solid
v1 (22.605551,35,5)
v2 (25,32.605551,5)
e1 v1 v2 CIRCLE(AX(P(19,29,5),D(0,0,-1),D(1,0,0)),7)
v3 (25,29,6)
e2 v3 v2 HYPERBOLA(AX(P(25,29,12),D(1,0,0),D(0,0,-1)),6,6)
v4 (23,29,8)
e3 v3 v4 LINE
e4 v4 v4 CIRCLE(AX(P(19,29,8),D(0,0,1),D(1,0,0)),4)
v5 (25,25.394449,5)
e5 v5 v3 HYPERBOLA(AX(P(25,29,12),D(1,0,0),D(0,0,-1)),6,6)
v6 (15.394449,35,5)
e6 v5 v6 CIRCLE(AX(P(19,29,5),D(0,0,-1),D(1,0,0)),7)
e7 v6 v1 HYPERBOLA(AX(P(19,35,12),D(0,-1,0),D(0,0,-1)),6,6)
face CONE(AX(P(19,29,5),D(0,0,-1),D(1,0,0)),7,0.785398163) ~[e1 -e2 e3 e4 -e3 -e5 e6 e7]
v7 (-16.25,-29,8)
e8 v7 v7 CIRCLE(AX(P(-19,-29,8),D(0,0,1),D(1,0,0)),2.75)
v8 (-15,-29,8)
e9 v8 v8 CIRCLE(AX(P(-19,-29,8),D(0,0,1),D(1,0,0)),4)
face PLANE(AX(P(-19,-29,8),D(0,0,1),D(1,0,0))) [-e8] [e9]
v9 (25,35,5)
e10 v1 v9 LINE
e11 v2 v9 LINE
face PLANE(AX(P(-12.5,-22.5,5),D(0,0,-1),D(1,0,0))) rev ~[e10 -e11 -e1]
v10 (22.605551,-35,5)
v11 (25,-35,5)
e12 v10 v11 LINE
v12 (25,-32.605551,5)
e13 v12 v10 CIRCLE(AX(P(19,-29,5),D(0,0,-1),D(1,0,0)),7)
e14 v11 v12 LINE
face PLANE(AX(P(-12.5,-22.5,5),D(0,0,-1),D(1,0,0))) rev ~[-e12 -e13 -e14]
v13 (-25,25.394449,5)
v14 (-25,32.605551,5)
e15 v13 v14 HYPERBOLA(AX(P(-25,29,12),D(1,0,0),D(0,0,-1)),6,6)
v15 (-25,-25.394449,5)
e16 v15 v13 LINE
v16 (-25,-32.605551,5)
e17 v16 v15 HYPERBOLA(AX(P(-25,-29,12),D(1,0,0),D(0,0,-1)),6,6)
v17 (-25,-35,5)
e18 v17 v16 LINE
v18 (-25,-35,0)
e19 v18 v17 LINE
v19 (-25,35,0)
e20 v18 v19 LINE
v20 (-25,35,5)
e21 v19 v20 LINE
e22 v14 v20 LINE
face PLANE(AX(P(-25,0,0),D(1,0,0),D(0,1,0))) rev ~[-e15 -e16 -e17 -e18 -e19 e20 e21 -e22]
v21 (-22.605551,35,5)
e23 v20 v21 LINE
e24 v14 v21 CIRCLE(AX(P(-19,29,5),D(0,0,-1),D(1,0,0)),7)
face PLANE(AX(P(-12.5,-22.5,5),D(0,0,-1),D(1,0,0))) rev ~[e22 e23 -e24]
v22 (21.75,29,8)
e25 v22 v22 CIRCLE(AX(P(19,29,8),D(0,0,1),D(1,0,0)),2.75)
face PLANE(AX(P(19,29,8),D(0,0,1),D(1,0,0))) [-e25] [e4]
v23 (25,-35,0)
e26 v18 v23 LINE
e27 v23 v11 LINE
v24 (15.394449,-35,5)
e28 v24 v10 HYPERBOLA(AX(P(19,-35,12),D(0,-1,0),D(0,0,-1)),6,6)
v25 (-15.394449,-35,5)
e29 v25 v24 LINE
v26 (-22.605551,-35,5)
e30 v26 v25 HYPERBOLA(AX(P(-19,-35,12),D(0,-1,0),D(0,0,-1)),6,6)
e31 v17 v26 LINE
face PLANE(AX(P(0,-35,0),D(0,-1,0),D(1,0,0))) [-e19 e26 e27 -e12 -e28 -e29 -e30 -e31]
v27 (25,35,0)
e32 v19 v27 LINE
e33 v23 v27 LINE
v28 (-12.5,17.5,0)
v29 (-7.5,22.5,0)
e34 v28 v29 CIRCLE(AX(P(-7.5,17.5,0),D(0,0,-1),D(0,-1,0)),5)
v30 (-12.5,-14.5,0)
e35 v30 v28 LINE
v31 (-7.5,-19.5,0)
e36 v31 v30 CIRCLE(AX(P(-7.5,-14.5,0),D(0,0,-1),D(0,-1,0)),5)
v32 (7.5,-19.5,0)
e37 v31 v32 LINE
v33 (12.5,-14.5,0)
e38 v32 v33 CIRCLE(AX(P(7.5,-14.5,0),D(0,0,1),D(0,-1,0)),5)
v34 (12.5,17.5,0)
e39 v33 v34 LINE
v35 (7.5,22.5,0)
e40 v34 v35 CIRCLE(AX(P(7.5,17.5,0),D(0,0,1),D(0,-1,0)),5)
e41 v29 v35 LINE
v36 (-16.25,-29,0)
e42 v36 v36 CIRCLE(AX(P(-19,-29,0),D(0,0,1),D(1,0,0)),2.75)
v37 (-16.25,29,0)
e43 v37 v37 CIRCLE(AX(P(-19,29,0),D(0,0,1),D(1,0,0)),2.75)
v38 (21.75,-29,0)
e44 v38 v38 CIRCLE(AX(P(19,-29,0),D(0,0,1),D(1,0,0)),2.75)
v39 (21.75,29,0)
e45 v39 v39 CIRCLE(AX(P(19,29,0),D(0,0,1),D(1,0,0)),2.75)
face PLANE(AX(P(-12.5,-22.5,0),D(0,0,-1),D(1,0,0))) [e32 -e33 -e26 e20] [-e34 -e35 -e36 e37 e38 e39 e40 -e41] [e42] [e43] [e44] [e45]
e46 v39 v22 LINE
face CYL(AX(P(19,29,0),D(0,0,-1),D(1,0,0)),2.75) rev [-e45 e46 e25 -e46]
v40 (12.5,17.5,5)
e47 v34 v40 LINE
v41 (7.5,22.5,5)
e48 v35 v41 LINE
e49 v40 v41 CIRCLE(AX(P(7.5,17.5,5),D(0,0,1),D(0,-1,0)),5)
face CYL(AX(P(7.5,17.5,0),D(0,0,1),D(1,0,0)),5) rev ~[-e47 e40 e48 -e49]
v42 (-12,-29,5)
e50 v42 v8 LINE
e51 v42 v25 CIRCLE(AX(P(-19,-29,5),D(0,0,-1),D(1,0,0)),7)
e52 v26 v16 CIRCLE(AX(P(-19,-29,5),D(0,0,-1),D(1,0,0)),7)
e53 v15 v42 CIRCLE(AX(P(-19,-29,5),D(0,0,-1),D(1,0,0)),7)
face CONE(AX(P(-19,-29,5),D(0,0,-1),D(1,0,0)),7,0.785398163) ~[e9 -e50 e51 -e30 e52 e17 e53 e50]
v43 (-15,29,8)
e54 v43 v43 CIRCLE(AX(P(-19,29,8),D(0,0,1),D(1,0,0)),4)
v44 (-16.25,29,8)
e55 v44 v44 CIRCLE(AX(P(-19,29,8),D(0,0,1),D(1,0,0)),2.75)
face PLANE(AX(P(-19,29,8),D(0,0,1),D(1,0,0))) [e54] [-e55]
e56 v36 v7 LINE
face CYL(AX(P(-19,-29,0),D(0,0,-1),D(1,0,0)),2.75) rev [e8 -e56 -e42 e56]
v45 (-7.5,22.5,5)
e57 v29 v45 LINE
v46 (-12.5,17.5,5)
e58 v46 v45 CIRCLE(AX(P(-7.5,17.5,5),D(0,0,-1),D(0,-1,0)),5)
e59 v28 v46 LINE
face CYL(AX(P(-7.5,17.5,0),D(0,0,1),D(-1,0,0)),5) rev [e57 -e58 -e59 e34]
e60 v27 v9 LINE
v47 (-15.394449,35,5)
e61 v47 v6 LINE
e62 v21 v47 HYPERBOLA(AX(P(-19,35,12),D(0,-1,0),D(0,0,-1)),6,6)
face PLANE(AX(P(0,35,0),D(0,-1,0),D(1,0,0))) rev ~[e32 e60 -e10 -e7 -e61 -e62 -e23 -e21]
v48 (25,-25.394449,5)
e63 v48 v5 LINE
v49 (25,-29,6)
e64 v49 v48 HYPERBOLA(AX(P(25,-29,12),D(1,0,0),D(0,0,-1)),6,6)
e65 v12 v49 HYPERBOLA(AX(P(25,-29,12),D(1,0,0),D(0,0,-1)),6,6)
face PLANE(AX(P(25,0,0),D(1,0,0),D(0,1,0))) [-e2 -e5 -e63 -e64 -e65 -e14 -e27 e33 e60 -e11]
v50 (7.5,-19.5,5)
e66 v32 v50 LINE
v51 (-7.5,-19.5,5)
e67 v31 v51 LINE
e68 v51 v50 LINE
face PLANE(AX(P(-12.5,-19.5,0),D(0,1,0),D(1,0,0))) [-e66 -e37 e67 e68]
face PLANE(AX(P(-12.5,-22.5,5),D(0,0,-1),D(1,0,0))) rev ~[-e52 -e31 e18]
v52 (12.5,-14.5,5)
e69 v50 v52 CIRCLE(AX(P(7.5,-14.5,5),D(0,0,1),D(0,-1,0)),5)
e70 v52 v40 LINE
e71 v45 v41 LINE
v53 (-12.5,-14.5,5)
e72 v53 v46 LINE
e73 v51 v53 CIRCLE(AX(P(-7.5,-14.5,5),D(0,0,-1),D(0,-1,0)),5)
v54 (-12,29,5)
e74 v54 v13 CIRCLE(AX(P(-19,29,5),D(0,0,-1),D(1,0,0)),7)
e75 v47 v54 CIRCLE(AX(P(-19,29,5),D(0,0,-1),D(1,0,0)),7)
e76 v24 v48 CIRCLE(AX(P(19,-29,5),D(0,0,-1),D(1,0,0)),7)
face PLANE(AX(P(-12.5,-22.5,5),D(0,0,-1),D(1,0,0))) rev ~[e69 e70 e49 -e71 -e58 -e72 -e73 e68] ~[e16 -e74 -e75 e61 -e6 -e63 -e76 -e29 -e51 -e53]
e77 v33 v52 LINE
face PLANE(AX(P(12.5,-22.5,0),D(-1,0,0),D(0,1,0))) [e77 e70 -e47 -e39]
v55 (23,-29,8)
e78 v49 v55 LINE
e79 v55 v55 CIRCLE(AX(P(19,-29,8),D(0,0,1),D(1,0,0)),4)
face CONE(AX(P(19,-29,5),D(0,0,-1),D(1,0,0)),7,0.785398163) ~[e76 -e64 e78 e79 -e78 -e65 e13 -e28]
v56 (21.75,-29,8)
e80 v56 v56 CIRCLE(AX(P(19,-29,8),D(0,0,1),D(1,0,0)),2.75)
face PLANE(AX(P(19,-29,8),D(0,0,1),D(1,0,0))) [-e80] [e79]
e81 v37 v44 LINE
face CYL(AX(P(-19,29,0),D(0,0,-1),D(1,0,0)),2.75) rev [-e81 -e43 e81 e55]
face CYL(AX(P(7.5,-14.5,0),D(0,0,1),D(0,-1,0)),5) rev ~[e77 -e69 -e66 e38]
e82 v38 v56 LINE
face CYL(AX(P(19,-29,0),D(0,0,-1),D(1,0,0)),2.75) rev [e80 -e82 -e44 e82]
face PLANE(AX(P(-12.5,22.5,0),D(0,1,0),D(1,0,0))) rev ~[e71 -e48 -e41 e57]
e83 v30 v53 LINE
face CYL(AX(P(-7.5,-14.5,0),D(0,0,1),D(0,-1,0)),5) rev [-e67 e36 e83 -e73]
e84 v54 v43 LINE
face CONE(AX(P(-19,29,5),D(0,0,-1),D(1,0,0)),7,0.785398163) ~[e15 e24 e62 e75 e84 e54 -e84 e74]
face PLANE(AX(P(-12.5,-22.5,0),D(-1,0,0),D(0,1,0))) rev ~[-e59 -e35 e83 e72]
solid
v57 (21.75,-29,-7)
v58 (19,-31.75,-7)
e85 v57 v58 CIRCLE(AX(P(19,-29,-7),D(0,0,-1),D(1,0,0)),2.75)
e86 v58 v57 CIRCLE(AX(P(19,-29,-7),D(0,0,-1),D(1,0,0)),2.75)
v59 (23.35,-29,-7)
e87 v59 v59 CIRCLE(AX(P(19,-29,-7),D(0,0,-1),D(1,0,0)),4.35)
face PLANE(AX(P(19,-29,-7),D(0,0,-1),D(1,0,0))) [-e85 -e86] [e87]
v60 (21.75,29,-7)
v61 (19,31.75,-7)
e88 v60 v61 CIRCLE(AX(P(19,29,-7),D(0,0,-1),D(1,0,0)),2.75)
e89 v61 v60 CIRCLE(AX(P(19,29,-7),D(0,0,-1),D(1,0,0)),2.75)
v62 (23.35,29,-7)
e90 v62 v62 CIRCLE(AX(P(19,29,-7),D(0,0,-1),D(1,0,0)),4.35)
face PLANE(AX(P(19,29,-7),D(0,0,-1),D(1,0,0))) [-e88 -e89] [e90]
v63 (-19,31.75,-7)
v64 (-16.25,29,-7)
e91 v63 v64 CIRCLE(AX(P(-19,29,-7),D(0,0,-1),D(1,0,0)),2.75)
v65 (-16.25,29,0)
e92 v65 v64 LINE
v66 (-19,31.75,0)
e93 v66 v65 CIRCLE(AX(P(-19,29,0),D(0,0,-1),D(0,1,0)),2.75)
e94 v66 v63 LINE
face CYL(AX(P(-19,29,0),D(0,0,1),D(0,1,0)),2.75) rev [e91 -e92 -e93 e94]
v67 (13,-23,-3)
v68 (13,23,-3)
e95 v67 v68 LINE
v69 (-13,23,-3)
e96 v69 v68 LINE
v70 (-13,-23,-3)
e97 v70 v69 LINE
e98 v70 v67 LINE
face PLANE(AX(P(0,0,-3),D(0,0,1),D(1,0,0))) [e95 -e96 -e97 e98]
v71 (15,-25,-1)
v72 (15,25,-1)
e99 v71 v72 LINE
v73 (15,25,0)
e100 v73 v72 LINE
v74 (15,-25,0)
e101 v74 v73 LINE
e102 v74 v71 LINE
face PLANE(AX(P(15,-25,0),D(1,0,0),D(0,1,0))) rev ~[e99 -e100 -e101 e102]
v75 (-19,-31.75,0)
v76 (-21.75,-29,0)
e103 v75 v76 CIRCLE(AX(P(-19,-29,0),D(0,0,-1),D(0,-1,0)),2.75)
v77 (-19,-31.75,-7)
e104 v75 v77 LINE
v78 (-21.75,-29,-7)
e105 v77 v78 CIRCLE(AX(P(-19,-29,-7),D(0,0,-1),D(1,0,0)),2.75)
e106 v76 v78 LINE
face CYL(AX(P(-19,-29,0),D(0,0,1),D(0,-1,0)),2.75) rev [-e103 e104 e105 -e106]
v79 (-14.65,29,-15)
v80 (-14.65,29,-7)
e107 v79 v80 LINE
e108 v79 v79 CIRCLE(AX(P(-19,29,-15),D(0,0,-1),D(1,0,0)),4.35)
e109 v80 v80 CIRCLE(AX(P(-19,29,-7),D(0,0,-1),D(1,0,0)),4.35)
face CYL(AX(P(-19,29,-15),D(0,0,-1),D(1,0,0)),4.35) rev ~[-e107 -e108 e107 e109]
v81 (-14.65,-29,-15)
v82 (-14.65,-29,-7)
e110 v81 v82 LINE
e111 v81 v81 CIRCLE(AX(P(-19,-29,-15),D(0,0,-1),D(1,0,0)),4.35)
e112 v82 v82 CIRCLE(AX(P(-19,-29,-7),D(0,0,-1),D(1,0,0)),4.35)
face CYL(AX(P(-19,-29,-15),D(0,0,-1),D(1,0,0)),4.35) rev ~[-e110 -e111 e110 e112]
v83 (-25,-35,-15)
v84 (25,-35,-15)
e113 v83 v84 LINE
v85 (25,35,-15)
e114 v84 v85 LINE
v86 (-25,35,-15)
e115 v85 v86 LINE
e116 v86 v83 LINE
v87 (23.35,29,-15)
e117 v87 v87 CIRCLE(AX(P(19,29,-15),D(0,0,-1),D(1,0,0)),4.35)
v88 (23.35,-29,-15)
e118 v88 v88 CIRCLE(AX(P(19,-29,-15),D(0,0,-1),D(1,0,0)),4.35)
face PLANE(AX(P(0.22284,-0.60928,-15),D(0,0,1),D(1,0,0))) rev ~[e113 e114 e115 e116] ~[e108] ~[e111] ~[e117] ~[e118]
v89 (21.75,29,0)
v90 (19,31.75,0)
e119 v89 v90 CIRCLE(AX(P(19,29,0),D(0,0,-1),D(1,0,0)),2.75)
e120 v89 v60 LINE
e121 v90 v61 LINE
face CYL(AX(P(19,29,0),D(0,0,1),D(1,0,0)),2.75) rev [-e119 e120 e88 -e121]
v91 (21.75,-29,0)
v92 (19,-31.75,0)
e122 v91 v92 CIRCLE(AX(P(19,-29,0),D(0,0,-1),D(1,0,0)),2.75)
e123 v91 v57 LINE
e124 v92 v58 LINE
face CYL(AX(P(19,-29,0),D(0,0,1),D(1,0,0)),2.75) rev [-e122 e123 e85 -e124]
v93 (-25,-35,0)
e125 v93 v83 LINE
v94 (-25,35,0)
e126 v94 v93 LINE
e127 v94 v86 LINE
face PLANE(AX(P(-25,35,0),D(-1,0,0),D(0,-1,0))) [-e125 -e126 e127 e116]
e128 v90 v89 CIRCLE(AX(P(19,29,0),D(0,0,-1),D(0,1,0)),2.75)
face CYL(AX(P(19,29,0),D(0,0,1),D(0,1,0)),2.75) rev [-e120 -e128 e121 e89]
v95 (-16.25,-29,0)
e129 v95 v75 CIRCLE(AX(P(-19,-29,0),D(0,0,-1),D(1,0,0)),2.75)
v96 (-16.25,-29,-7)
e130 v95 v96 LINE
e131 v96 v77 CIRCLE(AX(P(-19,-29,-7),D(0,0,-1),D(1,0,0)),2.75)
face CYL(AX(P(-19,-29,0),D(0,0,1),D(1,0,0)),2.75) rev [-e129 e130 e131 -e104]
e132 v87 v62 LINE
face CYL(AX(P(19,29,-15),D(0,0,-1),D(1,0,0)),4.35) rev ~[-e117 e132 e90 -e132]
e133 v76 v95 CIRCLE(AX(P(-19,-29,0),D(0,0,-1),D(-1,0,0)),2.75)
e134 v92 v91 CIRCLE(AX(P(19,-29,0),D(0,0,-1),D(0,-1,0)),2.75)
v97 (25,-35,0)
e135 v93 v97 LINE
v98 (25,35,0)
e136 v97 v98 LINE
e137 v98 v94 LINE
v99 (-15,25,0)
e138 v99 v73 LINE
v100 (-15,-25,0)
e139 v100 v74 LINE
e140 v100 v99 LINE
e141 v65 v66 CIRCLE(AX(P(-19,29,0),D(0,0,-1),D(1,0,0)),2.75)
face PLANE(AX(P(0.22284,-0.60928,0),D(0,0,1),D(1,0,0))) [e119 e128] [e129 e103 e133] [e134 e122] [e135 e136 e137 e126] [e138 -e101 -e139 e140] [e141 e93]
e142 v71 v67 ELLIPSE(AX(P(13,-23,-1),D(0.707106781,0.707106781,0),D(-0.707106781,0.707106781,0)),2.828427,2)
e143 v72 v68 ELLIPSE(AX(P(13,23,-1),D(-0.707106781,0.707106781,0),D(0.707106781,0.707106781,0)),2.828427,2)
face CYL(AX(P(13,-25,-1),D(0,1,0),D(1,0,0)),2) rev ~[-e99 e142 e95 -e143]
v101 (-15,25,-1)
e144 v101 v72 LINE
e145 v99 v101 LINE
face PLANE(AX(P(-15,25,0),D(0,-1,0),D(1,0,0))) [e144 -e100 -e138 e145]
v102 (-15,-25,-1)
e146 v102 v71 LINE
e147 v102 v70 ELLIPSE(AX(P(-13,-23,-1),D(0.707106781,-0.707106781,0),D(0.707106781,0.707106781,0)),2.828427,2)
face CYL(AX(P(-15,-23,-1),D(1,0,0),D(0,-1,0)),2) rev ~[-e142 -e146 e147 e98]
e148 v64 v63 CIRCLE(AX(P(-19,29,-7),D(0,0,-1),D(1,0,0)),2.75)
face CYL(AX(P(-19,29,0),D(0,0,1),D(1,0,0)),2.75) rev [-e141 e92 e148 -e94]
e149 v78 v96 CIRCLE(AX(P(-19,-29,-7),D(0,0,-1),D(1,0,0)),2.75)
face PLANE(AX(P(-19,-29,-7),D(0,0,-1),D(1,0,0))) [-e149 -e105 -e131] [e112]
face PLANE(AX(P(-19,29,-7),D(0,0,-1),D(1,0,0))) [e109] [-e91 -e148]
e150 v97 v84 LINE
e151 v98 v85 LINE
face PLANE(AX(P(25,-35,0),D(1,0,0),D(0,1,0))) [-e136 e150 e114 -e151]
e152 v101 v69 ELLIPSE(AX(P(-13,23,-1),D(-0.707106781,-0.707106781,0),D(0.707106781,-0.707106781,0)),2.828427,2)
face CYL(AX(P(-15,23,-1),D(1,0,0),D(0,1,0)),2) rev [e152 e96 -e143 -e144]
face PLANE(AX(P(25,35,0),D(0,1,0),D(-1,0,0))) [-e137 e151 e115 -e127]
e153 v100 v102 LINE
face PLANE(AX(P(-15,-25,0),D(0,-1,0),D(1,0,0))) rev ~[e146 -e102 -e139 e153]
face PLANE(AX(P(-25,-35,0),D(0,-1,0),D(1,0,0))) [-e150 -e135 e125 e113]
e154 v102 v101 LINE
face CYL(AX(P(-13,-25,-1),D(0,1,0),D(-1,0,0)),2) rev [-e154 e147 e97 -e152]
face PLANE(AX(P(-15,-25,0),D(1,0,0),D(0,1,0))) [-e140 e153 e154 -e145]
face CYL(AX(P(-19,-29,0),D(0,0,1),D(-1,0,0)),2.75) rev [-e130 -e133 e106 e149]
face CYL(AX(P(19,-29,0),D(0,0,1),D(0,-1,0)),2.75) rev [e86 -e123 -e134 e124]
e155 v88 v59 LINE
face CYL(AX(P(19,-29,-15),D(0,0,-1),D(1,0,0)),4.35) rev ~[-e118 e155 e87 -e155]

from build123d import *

# Parameters (mm, degrees)
F0_W     = 30
F0_H     = 50
F1_DEPTH = 15
F2_R     = 4.35
F2_R_2   = 2.75
F3_DEPTH = 8
F4_DEPTH = 3
F5_R     = 2
F6_W     = 50
F6_H     = 70
F6_R     = 4
F6_W_2   = 30
F6_H_2   = 50
F6_W_3   = 25
F6_H_3   = 45
F6_R_2   = 2.75
F7_DEPTH = 5
F8_DEPTH = 8
F9_DEPTH = 3
F11_R    = 5


# Not quite as in the source:
# - a fillet or chamfer that OpenCascade refuses, or shapes differently, is made with other operations: its cross-section is extruded or revolved along the edge and cut away or added


with BuildPart() as f1:
    # F0 (on Top) → F1 (new body)
    with BuildSketch(Plane.XY):
        with BuildLine():
            Line((19, 31.75), (19, 35))
            Line((19, 35), (-19, 35))
            Line((-19, 35), (-25, 35))
            Line((-25, 35), (-25, -29))
            Line((-25, -29), (-21.75, -29))
            ThreePointArc((-21.75, -29), (-19, -26.25), (-16.25, -29))
            ThreePointArc((-16.25, -29), (-17.0554563517, -30.9445436483), (-19, -31.75))
            Line((-19, -31.75), (-19, -35))
            Line((-19, -35), (19, -35))
            Line((19, -35), (19, -31.75))
            ThreePointArc((19, -31.75), (17.0554563517, -27.0554563517), (21.75, -29))
            Line((21.75, -29), (25, -29))
            Line((25, -29), (25, 29))
            Line((25, 29), (21.75, 29))
            ThreePointArc((21.75, 29), (17.0554563517, 27.0554563517), (19, 31.75))
        make_face()
        with BuildLine():
            ThreePointArc((-16.25, 29), (-20.9445436483, 27.0554563517), (-19, 31.75))
            ThreePointArc((-19, 31.75), (-17.0554563517, 30.9445436483), (-16.25, 29))
        make_face(mode=Mode.SUBTRACT)
        Rectangle(F0_W, F0_H, mode=Mode.SUBTRACT)
        with BuildLine():
            Line((25, 29), (25, 35))
            Line((25, 35), (19, 35))
            Line((19, 35), (19, 31.75))
            ThreePointArc((19, 31.75), (20.9445436483, 30.9445436483), (21.75, 29))
            Line((21.75, 29), (25, 29))
        make_face()
        with BuildLine():
            Line((25, -35), (25, -29))
            Line((25, -29), (21.75, -29))
            ThreePointArc((21.75, -29), (20.9445436483, -30.9445436483), (19, -31.75))
            Line((19, -31.75), (19, -35))
            Line((19, -35), (25, -35))
        make_face()
        with BuildLine():
            Line((-21.75, -29), (-25, -29))
            Line((-25, -29), (-25, -35))
            Line((-25, -35), (-19, -35))
            Line((-19, -35), (-19, -31.75))
            ThreePointArc((-19, -31.75), (-20.9445436483, -30.9445436483), (-21.75, -29))
        make_face()
        Rectangle(F0_W, F0_H)
    extrude(amount=-F1_DEPTH)

    # F2 (on face) → F3 (cut)
    with BuildSketch(Plane(origin=(0, 0, -15), x_dir=(1, 0, 0), z_dir=(0, 0, -1))):
        with Locations((-19, 29)):
            Circle(F2_R)
        with Locations((-19, 29)):
            Circle(F2_R_2, mode=Mode.SUBTRACT)
        with Locations((19, 29)):
            Circle(F2_R)
        with Locations((19, 29)):
            Circle(F2_R_2, mode=Mode.SUBTRACT)
        with Locations((19, -29)):
            Circle(F2_R)
        with Locations((19, -29)):
            Circle(F2_R_2, mode=Mode.SUBTRACT)
        with Locations((-19, -29)):
            Circle(F2_R)
        with Locations((-19, -29)):
            Circle(F2_R_2, mode=Mode.SUBTRACT)
    extrude(amount=-F3_DEPTH, mode=Mode.SUBTRACT)

    # F0 (on Top) → F4 (cut)
    with BuildSketch(Plane.XY):
        Rectangle(F0_W, F0_H)
    extrude(amount=-F4_DEPTH, mode=Mode.SUBTRACT)

    # F5
    f5_edges = [f1.edges().sort_by_distance(p)[0] for p in [
        (0, 25, -3),
        (15, 0, -3),
        (-15, 0, -3),
        (0, -25, -3),
    ]]
    fillet(f5_edges, radius=F5_R)


with BuildPart() as f7:
    # F6 (on face) → F7 (new body)
    with BuildSketch(Plane.XY):
        Rectangle(F6_W, F6_H)
        with Locations((-19, -29)):
            Circle(F6_R, mode=Mode.SUBTRACT)
        with Locations((19, -29)):
            Circle(F6_R, mode=Mode.SUBTRACT)
        with Locations((-19, 29)):
            Circle(F6_R, mode=Mode.SUBTRACT)
        Rectangle(F6_W_2, F6_H_2, mode=Mode.SUBTRACT)
        with Locations((19, 29)):
            Circle(F6_R, mode=Mode.SUBTRACT)
        Rectangle(F6_W_2, F6_H_2)
        Rectangle(F6_W_3, F6_H_3, mode=Mode.SUBTRACT)
        with Locations((19, -29)):
            Circle(F6_R)
        with Locations((19, -29)):
            Circle(F6_R_2, mode=Mode.SUBTRACT)
        with Locations((-19, -29)):
            Circle(F6_R)
        with Locations((-19, -29)):
            Circle(F6_R_2, mode=Mode.SUBTRACT)
        with Locations((19, 29)):
            Circle(F6_R)
        with Locations((19, 29)):
            Circle(F6_R_2, mode=Mode.SUBTRACT)
        with Locations((-19, 29)):
            Circle(F6_R)
        with Locations((-19, 29)):
            Circle(F6_R_2, mode=Mode.SUBTRACT)
    extrude(amount=F7_DEPTH)

    # F6 (on face) → F8 (join)
    with BuildSketch(Plane.XY):
        with Locations((19, 29)):
            Circle(F6_R)
        with Locations((19, 29)):
            Circle(F6_R_2, mode=Mode.SUBTRACT)
        with Locations((-19, 29)):
            Circle(F6_R)
        with Locations((-19, 29)):
            Circle(F6_R_2, mode=Mode.SUBTRACT)
        with Locations((-19, -29)):
            Circle(F6_R)
        with Locations((-19, -29)):
            Circle(F6_R_2, mode=Mode.SUBTRACT)
        with Locations((19, -29)):
            Circle(F6_R)
        with Locations((19, -29)):
            Circle(F6_R_2, mode=Mode.SUBTRACT)
    extrude(amount=F8_DEPTH)

    # F9 (add): a face of the model
    f9_faces = [f7.faces().sort_by_distance(p)[0] for p in [
        (0, -22.5, 2.5),
    ]]
    extrude(f9_faces, amount=F9_DEPTH)

    # F10: chamfer of 3 on 4 edges, made by hand


with BuildPart() as f10_tool2:
    # F10_s3 → F10_t4 (revolve)
    with BuildSketch(Plane.XZ.offset(-29)):
        Polygon((26, 5), (23, 8), (23, 5), align=None)
    revolve(axis=Axis((19, 29, 5), (0, 0, -1)))

    split(bisect_by=Plane.YZ.offset(25), keep=Keep.BOTTOM)

    split(bisect_by=Plane.XZ.offset(-35), keep=Keep.TOP)

    split(bisect_by=Plane.XY.offset(8), keep=Keep.BOTTOM)


with BuildPart() as f7_1:
    add(f7.part)

    # F10_t1: union F10_tool2
    add(f10_tool2.part)


with BuildPart() as f10_tool9:
    # F10_s10 → F10_t11 (revolve)
    with BuildSketch(Plane.XZ.offset(29)):
        Polygon((26, 5), (23, 8), (23, 5), align=None)
    revolve(axis=Axis((19, -29, 5), (0, 0, -1)))

    split(bisect_by=Plane.YZ.offset(25), keep=Keep.BOTTOM)

    split(bisect_by=Plane.XZ.offset(35), keep=Keep.BOTTOM)

    split(bisect_by=Plane.XY.offset(8), keep=Keep.BOTTOM)


with BuildPart() as f7_2:
    add(f7_1.part)

    # F10_t8: union F10_tool9
    add(f10_tool9.part)


with BuildPart() as f10_tool16:
    # F10_s17 → F10_t18 (revolve)
    with BuildSketch(Plane.XZ.offset(29)):
        Polygon((-12, 5), (-15, 8), (-15, 5), align=None)
    revolve(axis=Axis((-19, -29, 5), (0, 0, -1)))

    split(bisect_by=Plane.XZ.offset(35), keep=Keep.BOTTOM)

    split(bisect_by=Plane.YZ.offset(-25), keep=Keep.TOP)

    split(bisect_by=Plane.XY.offset(8), keep=Keep.BOTTOM)


with BuildPart() as f7_3:
    add(f7_2.part)

    # F10_t15: union F10_tool16
    add(f10_tool16.part)


with BuildPart() as f10_tool23:
    # F10_s24 → F10_t25 (revolve)
    with BuildSketch(Plane.XZ.offset(-29)):
        Polygon((-12, 5), (-15, 8), (-15, 5), align=None)
    revolve(axis=Axis((-19, 29, 5), (0, 0, -1)))

    split(bisect_by=Plane.XZ.offset(-35), keep=Keep.TOP)

    split(bisect_by=Plane.YZ.offset(-25), keep=Keep.TOP)

    split(bisect_by=Plane.XY.offset(8), keep=Keep.BOTTOM)


with BuildPart() as f7_4:
    add(f7_3.part)

    # F10_t22: union F10_tool23
    add(f10_tool23.part)

    # F11
    f11_edges = [f7_4.edges().sort_by_distance(p)[0] for p in [
        (-12.5, -19.5, 2.5),
        (12.5, -19.5, 2.5),
        (-12.5, 22.5, 2.5),
        (12.5, 22.5, 2.5),
    ]]
    fillet(f11_edges, radius=F11_R)


solid = Compound([f1.part, f7_4.part])
